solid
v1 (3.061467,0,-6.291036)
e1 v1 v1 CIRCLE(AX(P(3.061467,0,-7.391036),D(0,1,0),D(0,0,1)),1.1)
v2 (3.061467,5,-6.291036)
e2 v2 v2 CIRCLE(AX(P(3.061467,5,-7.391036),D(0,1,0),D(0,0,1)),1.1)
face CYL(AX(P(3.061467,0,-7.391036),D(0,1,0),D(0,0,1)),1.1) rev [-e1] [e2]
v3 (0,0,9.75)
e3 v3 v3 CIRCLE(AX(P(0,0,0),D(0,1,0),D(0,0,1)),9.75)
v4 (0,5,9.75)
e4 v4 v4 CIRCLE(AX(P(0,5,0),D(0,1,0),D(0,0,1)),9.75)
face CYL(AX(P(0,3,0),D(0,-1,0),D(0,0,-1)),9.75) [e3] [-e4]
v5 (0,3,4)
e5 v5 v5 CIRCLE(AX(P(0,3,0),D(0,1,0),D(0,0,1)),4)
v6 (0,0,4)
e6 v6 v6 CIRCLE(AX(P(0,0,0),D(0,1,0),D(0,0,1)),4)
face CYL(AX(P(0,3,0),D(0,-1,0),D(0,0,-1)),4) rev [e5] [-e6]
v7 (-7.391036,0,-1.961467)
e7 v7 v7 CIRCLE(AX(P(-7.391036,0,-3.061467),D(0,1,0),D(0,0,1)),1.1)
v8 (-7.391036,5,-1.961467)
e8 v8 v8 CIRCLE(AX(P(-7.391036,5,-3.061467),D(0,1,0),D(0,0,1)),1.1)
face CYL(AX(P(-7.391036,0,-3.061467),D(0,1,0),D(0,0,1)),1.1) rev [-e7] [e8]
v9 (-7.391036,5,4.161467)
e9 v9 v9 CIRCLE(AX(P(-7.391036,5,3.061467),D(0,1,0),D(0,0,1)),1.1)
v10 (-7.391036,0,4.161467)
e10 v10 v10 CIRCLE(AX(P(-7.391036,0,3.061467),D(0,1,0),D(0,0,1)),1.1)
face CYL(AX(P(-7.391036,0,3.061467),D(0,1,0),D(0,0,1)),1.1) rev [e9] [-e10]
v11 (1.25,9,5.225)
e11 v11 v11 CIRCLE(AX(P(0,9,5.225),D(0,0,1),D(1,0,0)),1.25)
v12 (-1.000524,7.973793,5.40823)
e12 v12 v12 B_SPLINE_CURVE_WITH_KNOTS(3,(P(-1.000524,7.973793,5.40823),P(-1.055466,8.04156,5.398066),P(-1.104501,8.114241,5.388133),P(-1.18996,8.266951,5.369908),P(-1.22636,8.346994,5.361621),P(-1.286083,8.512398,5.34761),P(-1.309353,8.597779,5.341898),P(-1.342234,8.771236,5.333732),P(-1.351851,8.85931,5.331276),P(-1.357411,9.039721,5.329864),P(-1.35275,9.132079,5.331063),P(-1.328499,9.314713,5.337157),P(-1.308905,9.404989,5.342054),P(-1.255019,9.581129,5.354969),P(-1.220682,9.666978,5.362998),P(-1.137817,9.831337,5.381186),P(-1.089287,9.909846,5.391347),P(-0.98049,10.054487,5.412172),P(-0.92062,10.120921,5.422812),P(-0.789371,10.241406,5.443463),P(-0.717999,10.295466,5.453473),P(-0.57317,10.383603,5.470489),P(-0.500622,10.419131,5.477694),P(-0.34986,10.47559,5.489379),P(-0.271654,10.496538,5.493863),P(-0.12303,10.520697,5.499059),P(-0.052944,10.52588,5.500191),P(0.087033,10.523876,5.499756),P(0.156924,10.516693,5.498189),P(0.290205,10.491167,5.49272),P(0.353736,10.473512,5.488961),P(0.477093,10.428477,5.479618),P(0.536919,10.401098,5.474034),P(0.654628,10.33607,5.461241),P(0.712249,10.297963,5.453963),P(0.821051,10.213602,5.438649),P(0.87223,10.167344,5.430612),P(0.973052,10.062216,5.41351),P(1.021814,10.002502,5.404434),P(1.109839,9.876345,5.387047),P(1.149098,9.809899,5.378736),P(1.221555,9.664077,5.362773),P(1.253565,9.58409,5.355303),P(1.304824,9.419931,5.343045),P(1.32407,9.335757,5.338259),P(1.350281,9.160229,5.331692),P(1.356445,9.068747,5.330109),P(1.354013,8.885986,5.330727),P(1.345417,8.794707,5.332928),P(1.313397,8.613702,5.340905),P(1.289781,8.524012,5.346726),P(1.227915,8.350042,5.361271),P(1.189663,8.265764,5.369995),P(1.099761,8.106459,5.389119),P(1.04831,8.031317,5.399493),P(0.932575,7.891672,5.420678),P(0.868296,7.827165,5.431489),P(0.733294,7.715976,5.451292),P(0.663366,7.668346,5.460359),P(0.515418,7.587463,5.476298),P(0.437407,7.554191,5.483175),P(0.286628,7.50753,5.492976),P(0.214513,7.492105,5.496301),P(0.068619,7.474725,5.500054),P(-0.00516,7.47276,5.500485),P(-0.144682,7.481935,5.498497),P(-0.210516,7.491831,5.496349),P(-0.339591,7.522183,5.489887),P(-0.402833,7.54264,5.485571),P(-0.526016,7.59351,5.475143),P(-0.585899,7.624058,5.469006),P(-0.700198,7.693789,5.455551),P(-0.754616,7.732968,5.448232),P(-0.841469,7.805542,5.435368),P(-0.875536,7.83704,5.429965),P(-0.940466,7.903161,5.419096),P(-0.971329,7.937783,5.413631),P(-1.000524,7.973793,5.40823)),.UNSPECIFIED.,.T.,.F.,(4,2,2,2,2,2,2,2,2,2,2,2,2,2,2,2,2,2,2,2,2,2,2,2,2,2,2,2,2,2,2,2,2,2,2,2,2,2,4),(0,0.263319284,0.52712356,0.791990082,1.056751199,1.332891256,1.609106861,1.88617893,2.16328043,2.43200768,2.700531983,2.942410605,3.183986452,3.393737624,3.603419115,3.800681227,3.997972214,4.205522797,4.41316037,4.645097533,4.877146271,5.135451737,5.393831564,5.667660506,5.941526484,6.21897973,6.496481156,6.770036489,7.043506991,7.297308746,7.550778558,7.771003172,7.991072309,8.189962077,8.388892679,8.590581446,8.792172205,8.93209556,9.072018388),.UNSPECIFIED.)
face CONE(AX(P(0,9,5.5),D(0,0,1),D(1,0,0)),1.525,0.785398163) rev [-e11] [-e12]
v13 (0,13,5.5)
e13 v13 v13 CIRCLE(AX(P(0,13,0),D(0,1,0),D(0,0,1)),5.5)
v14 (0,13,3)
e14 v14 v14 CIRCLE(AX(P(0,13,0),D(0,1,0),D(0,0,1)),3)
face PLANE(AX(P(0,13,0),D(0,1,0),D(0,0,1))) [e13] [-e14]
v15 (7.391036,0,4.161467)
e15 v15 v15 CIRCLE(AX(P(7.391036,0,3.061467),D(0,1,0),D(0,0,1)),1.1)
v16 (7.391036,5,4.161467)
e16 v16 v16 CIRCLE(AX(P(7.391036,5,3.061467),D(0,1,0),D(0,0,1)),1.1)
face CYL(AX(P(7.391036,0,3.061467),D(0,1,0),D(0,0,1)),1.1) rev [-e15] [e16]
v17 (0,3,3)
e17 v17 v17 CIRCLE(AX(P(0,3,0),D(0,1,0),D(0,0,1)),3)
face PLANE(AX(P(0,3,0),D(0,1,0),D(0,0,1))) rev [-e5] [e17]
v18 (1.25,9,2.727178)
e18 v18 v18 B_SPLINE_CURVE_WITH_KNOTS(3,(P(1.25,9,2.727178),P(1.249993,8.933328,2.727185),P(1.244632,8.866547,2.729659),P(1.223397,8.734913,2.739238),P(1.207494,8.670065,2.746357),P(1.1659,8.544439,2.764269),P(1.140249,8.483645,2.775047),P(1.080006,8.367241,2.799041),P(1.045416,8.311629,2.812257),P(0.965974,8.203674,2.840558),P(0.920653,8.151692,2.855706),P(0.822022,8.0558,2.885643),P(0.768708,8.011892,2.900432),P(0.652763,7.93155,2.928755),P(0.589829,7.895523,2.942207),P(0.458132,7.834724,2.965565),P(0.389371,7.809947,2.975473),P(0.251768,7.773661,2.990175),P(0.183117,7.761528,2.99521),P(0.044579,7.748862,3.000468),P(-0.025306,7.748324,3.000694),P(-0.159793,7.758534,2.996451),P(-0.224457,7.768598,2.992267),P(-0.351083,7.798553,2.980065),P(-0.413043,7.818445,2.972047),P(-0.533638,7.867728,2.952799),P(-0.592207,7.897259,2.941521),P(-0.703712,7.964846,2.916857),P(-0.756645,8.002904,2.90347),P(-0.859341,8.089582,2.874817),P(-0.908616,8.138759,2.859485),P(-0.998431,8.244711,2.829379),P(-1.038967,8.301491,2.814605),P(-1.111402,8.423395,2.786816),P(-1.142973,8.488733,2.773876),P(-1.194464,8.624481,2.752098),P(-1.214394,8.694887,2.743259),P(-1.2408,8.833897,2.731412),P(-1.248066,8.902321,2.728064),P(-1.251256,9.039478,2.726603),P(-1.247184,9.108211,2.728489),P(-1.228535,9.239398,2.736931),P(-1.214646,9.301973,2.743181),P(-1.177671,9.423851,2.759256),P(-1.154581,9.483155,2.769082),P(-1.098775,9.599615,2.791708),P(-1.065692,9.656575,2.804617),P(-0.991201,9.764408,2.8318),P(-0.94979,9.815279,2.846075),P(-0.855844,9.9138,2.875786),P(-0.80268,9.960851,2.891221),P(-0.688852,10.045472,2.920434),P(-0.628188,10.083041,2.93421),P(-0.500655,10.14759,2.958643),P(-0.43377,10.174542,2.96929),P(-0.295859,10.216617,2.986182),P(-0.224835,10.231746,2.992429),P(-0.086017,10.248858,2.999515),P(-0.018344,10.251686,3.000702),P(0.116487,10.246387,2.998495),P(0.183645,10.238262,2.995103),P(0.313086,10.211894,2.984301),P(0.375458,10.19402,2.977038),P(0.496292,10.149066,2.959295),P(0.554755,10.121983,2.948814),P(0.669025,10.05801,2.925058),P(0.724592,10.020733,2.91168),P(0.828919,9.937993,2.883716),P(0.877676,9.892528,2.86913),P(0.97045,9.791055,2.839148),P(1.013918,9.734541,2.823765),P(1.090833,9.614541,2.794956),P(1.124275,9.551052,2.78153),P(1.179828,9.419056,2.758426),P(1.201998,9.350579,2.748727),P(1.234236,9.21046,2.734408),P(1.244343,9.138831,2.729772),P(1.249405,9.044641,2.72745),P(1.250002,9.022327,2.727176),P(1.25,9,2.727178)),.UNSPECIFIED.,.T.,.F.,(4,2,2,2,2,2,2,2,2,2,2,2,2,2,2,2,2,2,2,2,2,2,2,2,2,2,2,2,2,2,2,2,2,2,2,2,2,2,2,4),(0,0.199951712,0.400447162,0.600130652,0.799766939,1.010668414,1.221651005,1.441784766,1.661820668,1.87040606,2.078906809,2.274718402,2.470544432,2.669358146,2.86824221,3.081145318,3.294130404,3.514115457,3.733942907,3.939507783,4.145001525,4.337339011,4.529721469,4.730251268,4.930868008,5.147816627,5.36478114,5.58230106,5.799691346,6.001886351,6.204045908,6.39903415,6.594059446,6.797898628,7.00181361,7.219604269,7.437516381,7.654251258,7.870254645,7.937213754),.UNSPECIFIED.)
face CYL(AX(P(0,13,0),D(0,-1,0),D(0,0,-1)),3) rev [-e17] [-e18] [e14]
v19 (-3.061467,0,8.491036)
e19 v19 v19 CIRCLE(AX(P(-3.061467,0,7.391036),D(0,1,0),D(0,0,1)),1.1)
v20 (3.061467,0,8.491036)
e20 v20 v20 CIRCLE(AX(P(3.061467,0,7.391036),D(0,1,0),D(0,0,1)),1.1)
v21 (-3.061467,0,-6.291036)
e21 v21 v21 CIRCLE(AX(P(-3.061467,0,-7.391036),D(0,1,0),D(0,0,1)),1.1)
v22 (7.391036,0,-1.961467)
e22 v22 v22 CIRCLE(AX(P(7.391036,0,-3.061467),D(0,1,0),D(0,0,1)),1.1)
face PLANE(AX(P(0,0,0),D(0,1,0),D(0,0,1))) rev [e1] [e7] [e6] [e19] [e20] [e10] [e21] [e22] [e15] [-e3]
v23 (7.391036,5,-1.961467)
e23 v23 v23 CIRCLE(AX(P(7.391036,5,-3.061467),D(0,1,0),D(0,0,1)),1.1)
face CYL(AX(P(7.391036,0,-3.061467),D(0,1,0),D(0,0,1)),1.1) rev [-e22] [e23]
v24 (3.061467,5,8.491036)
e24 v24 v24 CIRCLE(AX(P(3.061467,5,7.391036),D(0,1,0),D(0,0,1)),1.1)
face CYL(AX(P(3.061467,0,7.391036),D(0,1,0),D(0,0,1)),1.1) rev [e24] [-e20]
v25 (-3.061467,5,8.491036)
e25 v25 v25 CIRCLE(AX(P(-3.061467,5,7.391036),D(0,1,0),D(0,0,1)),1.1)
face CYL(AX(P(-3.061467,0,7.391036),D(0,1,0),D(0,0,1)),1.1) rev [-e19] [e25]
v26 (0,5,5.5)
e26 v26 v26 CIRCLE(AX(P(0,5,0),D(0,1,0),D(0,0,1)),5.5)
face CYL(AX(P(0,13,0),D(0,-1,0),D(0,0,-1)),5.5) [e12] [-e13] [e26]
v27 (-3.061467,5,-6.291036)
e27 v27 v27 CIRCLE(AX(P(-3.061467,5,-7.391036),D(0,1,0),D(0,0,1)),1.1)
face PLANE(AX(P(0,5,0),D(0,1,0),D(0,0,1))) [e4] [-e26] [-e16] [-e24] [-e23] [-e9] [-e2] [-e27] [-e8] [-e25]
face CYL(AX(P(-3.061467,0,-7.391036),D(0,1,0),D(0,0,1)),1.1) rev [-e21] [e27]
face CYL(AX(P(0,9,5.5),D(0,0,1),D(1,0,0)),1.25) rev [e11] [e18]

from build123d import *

# Parameters (mm, degrees)
SKETCH2_R           = 9.75
SKETCH2_R_2         = 4
BOSS_EXTRUDE1_DEPTH = 3
SKETCH3_R           = 5.5
SKETCH3_R_2         = 3
BOSS_EXTRUDE2_DEPTH = 10
SKETCH16_R          = 9.75
SKETCH16_R_2        = 5.5
BOSS_EXTRUDE3_DEPTH = 2
SKETCH5_R           = 1.1
CUT_EXTRUDE1_DEPTH  = 16.941298617


# Read off the part's stored shape, not the designer's step: M3x0.5 Tapped Hole1
with BuildPart() as part:
    # Sketch2 → Boss-Extrude1 (new body)
    with BuildSketch(Plane(origin=(0, 0, 0), x_dir=(1, 0, 0), z_dir=(0, 1, 0))):
        with Locations(Location((0, 0, 0), (0, 0, 270))):
            Circle(SKETCH2_R)
        with Locations(Location((0, 0, 0), (0, 0, 270))):
            Circle(SKETCH2_R_2, mode=Mode.SUBTRACT)
    extrude(amount=BOSS_EXTRUDE1_DEPTH)

    # Sketch3 → Boss-Extrude2 (add)
    with BuildSketch(Plane(origin=(0, 3, 0), x_dir=(1, 0, 0), z_dir=(0, 1, 0))):
        with Locations(Location((0, 0, 0), (0, 0, 270))):
            Circle(SKETCH3_R)
        with Locations(Location((0, 0, 0), (0, 0, 270))):
            Circle(SKETCH3_R_2, mode=Mode.SUBTRACT)
    extrude(amount=BOSS_EXTRUDE2_DEPTH)

    # Sketch16 → Boss-Extrude3 (add)
    with BuildSketch(Plane(origin=(0, 3, 0), x_dir=(1, 0, 0), z_dir=(0, 1, 0))):
        with Locations(Location((0, 0, 0), (0, 0, 270))):
            Circle(SKETCH16_R)
        with Locations(Location((0, 0, 0), (0, 0, 270))):
            Circle(SKETCH16_R_2, mode=Mode.SUBTRACT)
    extrude(amount=BOSS_EXTRUDE3_DEPTH)

    # M3x0.5 Tapped Hole1 outline → M3x0.5 Tapped Hole1 (revolve, cut)
    with BuildSketch(Plane.XZ.offset(-9)):
        Polygon((1.525000456, 5.500000456), (0, 5.500000456), (0, 2.727054604), (1.25, 2.727054604), (1.25, 5.225), align=None)
    revolve(axis=Axis((0, 9, 0), (0, 0, 1)), mode=Mode.SUBTRACT)

    # Sketch5 → Cut-Extrude1 (cut, through all)
    with BuildSketch(Plane(origin=(0, 5, 0), x_dir=(1, 0, 0), z_dir=(0, 1, 0))):
        with Locations(Location((3.061467459, 7.39103626, 0), (0, 0, 270))):
            Circle(SKETCH5_R)
        with Locations(Location((7.39103626, 3.061467459, 0), (0, 0, 270))):
            Circle(SKETCH5_R)
        with Locations(Location((7.39103626, -3.061467459, 0), (0, 0, 270))):
            Circle(SKETCH5_R)
        with Locations(Location((3.061467459, -7.39103626, 0), (0, 0, 270))):
            Circle(SKETCH5_R)
        with Locations(Location((-3.061467459, -7.39103626, 0), (0, 0, 270))):
            Circle(SKETCH5_R)
        with Locations(Location((-7.39103626, -3.061467459, 0), (0, 0, 270))):
            Circle(SKETCH5_R)
        with Locations(Location((-7.39103626, 3.061467459, 0), (0, 0, 270))):
            Circle(SKETCH5_R)
        with Locations(Location((-3.061467459, 7.39103626, 0), (0, 0, 270))):
            Circle(SKETCH5_R)
    extrude(amount=-CUT_EXTRUDE1_DEPTH, mode=Mode.SUBTRACT)


solid = part.part
